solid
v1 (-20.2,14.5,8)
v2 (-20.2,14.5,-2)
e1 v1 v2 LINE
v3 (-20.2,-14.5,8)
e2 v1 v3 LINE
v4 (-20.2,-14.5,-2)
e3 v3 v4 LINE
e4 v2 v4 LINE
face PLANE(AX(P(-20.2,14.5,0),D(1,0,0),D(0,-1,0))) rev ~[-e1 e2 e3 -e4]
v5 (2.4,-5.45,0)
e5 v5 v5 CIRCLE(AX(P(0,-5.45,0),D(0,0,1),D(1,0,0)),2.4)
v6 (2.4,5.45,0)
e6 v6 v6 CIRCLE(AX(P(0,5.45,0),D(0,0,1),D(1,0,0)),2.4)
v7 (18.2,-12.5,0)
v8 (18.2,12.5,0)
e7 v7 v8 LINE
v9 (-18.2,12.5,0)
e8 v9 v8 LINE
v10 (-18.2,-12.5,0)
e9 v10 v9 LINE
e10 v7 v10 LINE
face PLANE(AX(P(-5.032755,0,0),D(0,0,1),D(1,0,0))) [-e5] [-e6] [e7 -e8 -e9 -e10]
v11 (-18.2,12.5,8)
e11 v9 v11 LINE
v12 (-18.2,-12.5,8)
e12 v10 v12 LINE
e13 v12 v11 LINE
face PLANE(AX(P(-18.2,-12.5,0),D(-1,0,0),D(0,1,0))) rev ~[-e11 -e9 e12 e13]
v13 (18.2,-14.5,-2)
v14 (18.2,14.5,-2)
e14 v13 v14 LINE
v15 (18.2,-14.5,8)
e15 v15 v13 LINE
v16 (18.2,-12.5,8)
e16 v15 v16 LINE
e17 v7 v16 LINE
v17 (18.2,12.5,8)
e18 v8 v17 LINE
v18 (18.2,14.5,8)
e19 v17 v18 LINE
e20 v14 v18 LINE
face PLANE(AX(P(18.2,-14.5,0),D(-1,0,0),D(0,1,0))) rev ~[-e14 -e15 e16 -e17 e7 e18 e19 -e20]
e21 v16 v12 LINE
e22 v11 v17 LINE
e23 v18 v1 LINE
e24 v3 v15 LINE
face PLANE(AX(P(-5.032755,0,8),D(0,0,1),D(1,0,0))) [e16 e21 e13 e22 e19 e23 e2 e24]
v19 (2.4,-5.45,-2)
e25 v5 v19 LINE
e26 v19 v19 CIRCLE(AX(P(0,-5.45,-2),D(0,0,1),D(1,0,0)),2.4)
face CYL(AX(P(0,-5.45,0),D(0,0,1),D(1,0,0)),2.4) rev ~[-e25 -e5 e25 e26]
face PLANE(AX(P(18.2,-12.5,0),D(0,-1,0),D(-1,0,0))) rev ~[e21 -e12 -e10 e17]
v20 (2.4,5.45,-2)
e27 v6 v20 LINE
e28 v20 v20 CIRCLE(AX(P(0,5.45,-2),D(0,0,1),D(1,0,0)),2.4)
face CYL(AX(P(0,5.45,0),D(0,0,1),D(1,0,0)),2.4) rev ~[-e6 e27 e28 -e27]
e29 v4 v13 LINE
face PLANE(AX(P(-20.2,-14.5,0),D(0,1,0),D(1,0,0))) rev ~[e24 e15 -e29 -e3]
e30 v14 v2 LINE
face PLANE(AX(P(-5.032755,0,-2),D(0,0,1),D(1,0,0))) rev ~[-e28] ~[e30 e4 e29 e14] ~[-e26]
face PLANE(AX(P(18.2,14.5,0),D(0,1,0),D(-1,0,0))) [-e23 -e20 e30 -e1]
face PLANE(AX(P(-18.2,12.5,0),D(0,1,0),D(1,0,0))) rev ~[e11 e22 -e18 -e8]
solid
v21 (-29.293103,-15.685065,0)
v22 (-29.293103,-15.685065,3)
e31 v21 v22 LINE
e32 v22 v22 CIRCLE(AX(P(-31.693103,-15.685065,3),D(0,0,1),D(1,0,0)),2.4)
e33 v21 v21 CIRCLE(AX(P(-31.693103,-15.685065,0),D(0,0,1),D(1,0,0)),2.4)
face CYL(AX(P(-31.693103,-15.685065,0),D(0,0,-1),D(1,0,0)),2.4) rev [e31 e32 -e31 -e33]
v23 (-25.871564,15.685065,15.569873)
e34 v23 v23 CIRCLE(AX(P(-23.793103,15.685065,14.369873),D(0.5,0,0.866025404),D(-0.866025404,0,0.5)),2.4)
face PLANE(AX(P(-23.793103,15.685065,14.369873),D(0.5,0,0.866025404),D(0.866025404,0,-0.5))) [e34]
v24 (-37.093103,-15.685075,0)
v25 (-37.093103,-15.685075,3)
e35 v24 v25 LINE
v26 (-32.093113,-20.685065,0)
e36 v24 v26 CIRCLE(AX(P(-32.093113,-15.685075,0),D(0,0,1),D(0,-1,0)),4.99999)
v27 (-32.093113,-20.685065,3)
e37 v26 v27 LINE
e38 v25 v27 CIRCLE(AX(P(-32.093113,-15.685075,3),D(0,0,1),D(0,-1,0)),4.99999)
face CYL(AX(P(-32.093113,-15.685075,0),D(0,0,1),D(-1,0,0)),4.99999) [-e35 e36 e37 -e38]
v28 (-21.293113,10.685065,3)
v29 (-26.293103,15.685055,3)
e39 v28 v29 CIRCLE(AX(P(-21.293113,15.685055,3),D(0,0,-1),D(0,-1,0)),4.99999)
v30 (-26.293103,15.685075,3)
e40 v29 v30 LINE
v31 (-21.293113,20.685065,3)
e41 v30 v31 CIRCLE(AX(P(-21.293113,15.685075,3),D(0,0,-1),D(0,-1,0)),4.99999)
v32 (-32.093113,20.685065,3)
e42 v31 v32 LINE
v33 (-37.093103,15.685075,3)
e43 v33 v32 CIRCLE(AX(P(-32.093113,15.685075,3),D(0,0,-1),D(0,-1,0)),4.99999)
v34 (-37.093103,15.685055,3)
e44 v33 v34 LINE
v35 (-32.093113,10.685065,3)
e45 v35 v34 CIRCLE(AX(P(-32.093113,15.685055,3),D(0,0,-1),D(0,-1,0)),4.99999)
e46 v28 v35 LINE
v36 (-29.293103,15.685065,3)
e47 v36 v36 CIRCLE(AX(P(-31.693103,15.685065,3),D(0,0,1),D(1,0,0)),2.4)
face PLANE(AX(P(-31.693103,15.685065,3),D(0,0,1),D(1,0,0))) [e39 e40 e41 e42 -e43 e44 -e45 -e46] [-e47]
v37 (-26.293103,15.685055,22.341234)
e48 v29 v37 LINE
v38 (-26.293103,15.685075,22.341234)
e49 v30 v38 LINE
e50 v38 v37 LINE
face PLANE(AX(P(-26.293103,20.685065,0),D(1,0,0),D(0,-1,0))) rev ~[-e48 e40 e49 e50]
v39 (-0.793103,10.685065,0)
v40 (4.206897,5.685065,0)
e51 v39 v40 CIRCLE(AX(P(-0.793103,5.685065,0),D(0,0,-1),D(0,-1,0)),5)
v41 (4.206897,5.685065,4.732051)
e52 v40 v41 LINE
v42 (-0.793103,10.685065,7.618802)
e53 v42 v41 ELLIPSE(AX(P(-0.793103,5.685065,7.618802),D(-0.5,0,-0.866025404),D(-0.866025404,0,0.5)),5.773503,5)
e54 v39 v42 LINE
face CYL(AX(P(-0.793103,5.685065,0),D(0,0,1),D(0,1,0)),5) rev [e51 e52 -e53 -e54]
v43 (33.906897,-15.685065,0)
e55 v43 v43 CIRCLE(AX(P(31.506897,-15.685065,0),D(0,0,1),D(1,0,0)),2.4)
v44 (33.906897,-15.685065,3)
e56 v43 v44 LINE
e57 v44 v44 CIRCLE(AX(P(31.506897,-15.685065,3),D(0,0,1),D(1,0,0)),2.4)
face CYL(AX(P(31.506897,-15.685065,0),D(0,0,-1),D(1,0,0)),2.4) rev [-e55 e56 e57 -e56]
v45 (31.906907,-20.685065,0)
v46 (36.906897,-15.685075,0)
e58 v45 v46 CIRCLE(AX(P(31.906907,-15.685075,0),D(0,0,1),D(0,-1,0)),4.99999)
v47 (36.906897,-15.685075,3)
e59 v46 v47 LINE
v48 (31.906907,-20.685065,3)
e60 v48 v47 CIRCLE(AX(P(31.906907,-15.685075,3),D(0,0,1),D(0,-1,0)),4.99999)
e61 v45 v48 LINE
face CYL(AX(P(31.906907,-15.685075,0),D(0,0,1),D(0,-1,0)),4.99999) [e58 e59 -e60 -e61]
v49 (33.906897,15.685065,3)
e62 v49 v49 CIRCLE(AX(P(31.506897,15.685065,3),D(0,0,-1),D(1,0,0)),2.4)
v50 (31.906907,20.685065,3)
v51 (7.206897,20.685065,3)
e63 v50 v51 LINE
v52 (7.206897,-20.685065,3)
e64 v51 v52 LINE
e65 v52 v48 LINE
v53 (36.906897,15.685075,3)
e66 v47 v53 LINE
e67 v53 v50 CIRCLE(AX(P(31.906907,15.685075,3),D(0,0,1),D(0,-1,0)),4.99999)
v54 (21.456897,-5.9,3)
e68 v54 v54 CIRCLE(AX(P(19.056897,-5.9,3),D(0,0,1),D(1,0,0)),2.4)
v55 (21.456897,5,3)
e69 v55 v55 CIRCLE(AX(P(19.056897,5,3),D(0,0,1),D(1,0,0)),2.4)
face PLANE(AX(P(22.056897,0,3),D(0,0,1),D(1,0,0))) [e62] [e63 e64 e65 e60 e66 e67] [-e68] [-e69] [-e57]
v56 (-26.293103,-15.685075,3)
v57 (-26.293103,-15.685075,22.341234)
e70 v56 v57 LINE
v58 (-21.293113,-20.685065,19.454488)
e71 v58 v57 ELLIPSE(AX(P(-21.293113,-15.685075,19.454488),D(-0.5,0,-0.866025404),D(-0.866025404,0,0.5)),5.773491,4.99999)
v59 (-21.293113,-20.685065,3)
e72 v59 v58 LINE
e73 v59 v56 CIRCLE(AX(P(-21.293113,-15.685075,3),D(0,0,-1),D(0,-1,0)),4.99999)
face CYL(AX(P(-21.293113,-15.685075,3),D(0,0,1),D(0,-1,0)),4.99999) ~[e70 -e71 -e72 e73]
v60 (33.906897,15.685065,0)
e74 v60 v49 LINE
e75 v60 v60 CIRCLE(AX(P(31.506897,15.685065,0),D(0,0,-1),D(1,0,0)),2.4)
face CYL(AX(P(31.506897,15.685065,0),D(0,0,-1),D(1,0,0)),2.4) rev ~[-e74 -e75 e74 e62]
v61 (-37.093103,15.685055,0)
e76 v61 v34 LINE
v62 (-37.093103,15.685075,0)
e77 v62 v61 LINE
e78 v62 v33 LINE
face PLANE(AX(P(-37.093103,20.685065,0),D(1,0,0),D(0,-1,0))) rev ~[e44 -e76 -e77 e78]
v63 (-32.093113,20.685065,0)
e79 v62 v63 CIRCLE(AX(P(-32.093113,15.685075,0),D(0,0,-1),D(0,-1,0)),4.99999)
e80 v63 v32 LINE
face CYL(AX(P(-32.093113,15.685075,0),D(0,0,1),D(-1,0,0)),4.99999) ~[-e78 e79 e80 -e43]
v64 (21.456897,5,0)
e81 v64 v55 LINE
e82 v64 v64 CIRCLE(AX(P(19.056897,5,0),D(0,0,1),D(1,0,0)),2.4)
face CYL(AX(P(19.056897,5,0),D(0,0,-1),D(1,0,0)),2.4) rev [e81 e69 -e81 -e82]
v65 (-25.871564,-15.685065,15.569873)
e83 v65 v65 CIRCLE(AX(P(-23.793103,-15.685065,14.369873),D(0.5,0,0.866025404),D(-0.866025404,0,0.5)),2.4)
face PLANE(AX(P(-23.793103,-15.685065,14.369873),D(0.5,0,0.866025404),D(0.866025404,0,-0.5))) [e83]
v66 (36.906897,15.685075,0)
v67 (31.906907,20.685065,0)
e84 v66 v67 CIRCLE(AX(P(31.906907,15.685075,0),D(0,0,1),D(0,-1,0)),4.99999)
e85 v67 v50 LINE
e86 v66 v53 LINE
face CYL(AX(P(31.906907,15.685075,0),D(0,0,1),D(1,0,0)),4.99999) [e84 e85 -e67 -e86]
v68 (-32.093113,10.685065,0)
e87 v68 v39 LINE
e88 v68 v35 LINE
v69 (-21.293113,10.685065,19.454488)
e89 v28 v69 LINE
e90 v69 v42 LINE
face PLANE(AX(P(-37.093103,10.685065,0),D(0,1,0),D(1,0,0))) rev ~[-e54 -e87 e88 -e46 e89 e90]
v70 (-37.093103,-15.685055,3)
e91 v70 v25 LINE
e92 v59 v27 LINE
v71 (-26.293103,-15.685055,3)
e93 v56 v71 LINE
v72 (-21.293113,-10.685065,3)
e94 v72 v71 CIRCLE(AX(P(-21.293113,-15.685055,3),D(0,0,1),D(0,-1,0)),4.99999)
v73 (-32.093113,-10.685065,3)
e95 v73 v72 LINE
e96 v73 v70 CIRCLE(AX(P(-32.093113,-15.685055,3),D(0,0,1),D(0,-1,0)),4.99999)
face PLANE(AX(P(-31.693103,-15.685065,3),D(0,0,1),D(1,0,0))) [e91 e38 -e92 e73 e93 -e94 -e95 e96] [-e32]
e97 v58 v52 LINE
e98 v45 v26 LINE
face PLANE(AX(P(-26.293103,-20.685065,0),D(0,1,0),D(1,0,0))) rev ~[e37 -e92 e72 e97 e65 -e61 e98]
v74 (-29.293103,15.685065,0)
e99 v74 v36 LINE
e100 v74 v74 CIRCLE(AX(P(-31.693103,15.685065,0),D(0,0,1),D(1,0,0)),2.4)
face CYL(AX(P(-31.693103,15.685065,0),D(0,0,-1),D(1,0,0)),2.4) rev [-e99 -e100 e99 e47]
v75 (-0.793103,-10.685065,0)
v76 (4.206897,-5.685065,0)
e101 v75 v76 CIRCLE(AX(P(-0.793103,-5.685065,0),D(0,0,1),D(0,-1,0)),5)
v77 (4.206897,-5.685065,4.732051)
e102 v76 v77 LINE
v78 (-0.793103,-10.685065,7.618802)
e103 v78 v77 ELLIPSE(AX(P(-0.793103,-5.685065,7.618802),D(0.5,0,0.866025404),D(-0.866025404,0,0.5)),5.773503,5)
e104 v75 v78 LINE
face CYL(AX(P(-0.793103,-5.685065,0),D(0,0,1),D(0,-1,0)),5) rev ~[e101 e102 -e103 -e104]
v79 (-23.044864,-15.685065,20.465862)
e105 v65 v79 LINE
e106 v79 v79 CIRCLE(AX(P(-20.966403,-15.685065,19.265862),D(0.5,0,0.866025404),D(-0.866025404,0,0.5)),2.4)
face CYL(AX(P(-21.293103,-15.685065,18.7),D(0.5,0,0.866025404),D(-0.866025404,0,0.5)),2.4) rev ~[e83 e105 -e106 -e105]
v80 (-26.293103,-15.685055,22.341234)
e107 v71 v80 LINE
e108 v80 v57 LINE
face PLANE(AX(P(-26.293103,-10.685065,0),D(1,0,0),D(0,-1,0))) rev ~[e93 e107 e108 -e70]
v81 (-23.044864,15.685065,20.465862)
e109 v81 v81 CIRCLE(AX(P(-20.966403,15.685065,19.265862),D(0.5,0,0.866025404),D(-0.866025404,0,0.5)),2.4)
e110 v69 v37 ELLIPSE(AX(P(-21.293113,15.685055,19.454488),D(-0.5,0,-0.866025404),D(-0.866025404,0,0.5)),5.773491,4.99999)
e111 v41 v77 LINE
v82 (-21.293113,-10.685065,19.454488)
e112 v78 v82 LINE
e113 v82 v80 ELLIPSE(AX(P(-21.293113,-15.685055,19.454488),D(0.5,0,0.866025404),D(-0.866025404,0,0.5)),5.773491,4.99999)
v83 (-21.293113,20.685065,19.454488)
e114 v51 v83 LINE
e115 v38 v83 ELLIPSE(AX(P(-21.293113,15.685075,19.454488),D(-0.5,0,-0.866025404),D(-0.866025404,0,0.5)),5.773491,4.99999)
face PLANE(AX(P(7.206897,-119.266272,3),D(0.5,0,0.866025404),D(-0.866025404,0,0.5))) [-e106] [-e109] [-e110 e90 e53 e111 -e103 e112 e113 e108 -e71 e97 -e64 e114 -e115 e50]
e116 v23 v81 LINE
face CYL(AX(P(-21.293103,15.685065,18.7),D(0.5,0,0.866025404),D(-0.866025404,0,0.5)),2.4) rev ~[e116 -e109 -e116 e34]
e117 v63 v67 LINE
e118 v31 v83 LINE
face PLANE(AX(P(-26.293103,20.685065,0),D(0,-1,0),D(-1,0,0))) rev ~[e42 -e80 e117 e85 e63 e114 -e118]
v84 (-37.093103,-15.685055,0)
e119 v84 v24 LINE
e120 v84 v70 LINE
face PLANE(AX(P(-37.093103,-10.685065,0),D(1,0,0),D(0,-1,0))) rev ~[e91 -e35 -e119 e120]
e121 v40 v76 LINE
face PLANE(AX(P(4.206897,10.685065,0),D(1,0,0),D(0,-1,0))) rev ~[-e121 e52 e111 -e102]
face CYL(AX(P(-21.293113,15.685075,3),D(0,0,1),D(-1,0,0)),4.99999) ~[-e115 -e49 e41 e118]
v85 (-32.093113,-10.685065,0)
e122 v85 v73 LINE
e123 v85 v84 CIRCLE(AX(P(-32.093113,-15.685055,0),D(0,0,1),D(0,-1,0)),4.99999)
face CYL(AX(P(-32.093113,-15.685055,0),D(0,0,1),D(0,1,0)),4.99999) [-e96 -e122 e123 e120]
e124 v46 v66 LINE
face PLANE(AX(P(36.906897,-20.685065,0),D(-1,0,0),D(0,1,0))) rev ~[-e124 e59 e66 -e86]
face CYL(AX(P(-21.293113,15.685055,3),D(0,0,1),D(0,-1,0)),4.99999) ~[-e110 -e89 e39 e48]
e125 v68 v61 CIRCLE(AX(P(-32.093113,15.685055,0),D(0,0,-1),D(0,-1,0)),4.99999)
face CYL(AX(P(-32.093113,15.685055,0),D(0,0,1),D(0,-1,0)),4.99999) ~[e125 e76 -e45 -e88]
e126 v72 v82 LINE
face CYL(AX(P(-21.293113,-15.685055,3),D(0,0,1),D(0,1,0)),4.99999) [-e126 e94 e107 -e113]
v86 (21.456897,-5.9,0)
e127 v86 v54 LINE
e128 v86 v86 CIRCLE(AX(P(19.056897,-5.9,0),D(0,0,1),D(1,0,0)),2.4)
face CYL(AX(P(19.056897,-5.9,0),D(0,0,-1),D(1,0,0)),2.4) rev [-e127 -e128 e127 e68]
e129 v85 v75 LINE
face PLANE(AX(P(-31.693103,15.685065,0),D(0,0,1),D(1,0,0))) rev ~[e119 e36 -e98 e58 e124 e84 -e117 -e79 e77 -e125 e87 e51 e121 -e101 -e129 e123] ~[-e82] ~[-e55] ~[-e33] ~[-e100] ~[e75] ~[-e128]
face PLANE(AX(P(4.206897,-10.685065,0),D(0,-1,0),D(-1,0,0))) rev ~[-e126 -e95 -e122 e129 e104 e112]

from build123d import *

# Parameters (mm, degrees)
F0_W        = 3
F0_H        = 5
F1_DEPTH    = 25
F0_R        = 2.4
F2_DEPTH    = 3
F3_T4_DEPTH = 238.5325445422
F4_R        = 4.99999
F5_R        = 4.99999
F6_R        = 5
F8_DEPTH    = 5
F9_ANGLE    = -30
F10_ANGLE   = -30
F7_W        = 36.4
F7_H        = 25
F7_R        = 4.4
F7_R_2      = 2.4
F13_DEPTH   = 2
F14_DEPTH   = 8


# Not quite as in the source:
# - a fillet or chamfer that OpenCascade refuses, or shapes differently, is made with other operations: its cross-section is extruded or revolved along the edge and cut away or added
# - a fillet or chamfer is up to 0.001 mm smaller than in the source, because OpenCascade refuses the exact size


with BuildPart() as f1:
    # F0 (on Top) → F1 (new body)
    with BuildSketch(Plane.XY):
        Polygon((-26.2931033156, 20.6850649182), (-26.2931033156, 15.6850649182), (-26.2931033156, 10.6850649182), (4.2068966844, 10.6850649182), (4.2068966844, 15.6850649182), (4.2068966844, 20.6850649182), align=None)
        with BuildLine():
            ThreePointArc((-18.8931033156, 15.6850649182), (-21.2931033156, 13.2850649182), (-23.6931033156, 15.6850649182))
            ThreePointArc((-23.6931033156, 15.6850649182), (-21.2931033156, 18.0850649182), (-18.8931033156, 15.6850649182))
        make_face(mode=Mode.SUBTRACT)
        Polygon((4.2068966844, -20.6850649182), (4.2068966844, -10.6850649182), (-26.2931033156, -10.6850649182), (-26.2931033156, -15.6850649182), (-26.2931033156, -20.6850649182), align=None)
        with BuildLine():
            ThreePointArc((-18.8931033156, -15.6850649182), (-21.2931033156, -18.0850649182), (-23.6931033156, -15.6850649182))
            ThreePointArc((-23.6931033156, -15.6850649182), (-21.2931033156, -13.2850649182), (-18.8931033156, -15.6850649182))
        make_face(mode=Mode.SUBTRACT)
        Polygon((4.2068966844, 15.6850649182), (4.2068966844, 10.6850649182), (4.2068966844, -10.6850649182), (4.2068966844, -20.6850649182), (7.2068966844, -20.6850649182), (7.2068966844, 15.6850649182), align=None)
        with BuildLine():
            ThreePointArc((-18.8931033156, 15.6850649182), (-21.2931033156, 18.0850649182), (-23.6931033156, 15.6850649182))
            ThreePointArc((-23.6931033156, 15.6850649182), (-21.2931033156, 13.2850649182), (-18.8931033156, 15.6850649182))
        make_face()
        with BuildLine():
            ThreePointArc((-18.8931033156, -15.6850649182), (-21.2931033156, -13.2850649182), (-23.6931033156, -15.6850649182))
            ThreePointArc((-23.6931033156, -15.6850649182), (-21.2931033156, -18.0850649182), (-18.8931033156, -15.6850649182))
        make_face()
        with Locations((5.7068966844, 18.1850649182)):
            Rectangle(F0_W, F0_H)
    extrude(amount=F1_DEPTH)

    # F0 (on Top) → F2 (join)
    with BuildSketch(Plane.XY):
        Polygon((-26.2931033156, 10.6850649182), (-26.2931033156, 15.6850649182), (-26.2931033156, 20.6850649182), (-37.0931033156, 20.6850649182), (-37.0931033156, 10.6850649182), align=None)
        with Locations((-31.6931033156, 15.6850649182)):
            Circle(F0_R, mode=Mode.SUBTRACT)
        Polygon((-26.2931033156, -15.6850649182), (-26.2931033156, -10.6850649182), (-37.0931033156, -10.6850649182), (-37.0931033156, -20.6850649182), (-26.2931033156, -20.6850649182), align=None)
        with Locations((-31.6931033156, -15.6850649182)):
            Circle(F0_R, mode=Mode.SUBTRACT)
        Polygon((36.9068966844, 20.6850649182), (7.2068966844, 20.6850649182), (7.2068966844, 15.6850649182), (7.2068966844, -20.6850649182), (36.9068966844, -20.6850649182), align=None)
        with Locations((31.5068966844, -15.6850649182)):
            Circle(F0_R, mode=Mode.SUBTRACT)
        with Locations((19.0568966844, -5.9)):
            Circle(F0_R, mode=Mode.SUBTRACT)
        with Locations((19.0568966844, 5)):
            Circle(F0_R, mode=Mode.SUBTRACT)
        with BuildLine():
            ThreePointArc((29.1068966844, 15.6850649182), (31.5068966844, 18.0850649182), (33.9068966844, 15.6850649182))
            ThreePointArc((33.9068966844, 15.6850649182), (31.5068966844, 13.2850649182), (29.1068966844, 15.6850649182))
        make_face(mode=Mode.SUBTRACT)
    extrude(amount=F2_DEPTH)

    # F3: chamfer of 22 x 38.1051177665 on 1 edges, made by hand


with BuildPart() as f3_tool2:
    # F3_s3 → F3_t4 (new body)
    with BuildSketch(Plane.XZ.offset(119.2662722711)):
        Polygon((7.2068966844, 3), (-30.8982210821, 25), (7.2068966844, 25), align=None)
    extrude(amount=-F3_T4_DEPTH)

    split(bisect_by=Plane.XY.offset(3), keep=Keep.TOP)


with BuildPart() as f1_1:
    add(f1.part)

    # F3_t1: cut F3_tool2
    add(f3_tool2.part, mode=Mode.SUBTRACT)

    # F4 (radius 5 in the source; OpenCascade refuses exactly that, so slightly less here)
    f4_edges = [f1_1.edges().sort_by_distance(p)[0] for p in [
        (-37.093103, 20.685065, 1.5),
        (-37.093103, 10.685065, 1.5),
        (-37.093103, -10.685065, 1.5),
        (-37.093103, -20.685065, 1.5),
        (36.906897, -20.685065, 1.5),
        (36.906897, 20.685065, 1.5),
    ]]
    fillet(f4_edges, radius=F4_R)

    # F5 (radius 5 in the source; OpenCascade refuses exactly that, so slightly less here)
    f5_edges = [f1_1.edges().sort_by_distance(p)[0] for p in [
        (-26.293103, 20.685065, 12.670617),
        (-26.293103, 10.685065, 12.670617),
        (-26.293103, -10.685065, 12.670617),
        (-26.293103, -20.685065, 12.670617),
    ]]
    fillet(f5_edges, radius=F5_R)

    # F6
    f6_edges = [f1_1.edges().sort_by_distance(p)[0] for p in [
        (4.206897, 10.685065, 2.366025),
        (4.206897, -10.685065, 2.366025),
    ]]
    fillet(f6_edges, radius=F6_R)


with BuildPart() as f8:
    # F0 (on Top) → F8 (new body, symmetric)
    with BuildSketch(Plane.XY):
        with BuildLine():
            ThreePointArc((-18.8931033156, 15.6850649182), (-21.2931033156, 18.0850649182), (-23.6931033156, 15.6850649182))
            ThreePointArc((-23.6931033156, 15.6850649182), (-21.2931033156, 13.2850649182), (-18.8931033156, 15.6850649182))
        make_face()
    extrude(amount=F8_DEPTH, both=True)


with BuildPart() as f8b:
    # F0 (on Top) → F8, piece 2 (new body, symmetric)
    with BuildSketch(Plane.XY):
        with BuildLine():
            ThreePointArc((-18.8931033156, -15.6850649182), (-21.2931033156, -13.2850649182), (-23.6931033156, -15.6850649182))
            ThreePointArc((-23.6931033156, -15.6850649182), (-21.2931033156, -18.0850649182), (-18.8931033156, -15.6850649182))
        make_face()
    extrude(amount=F8_DEPTH, both=True)


with BuildPart() as f8b_1:
    # F9: moved
    add(f8b.part.rotate(Axis((-21.2931033156, -15.6850649182, 0), (0, -1, 0)), F9_ANGLE))


with BuildPart() as f8_1:
    # F10: moved
    add(f8.part.rotate(Axis((-21.2931033156, 15.6850649182, 0), (0, -1, 0)), F10_ANGLE))


with BuildPart() as f8b_2:
    # F11: moved
    add(f8b_1.part.moved(Location((0, 0, 18.7))))


with BuildPart() as f8_2:
    # F11: moved
    add(f8_1.part.moved(Location((0, 0, 18.7))))


with BuildPart() as f1_2:
    add(f1_1.part)

    # F12: cut F8, F8b
    add(f8_2.part, mode=Mode.SUBTRACT)
    add(f8b_2.part, mode=Mode.SUBTRACT)


with BuildPart() as f13:
    # F7 (on Top) → F13 (new body)
    with BuildSketch(Plane.XY):
        Polygon((18.2, -14.5), (18.2, -12.5), (-18.2, -12.5), (-18.2, 12.5), (18.2, 12.5), (18.2, 14.5), (-20.2, 14.5), (-20.2, -14.5), align=None)
        Rectangle(F7_W, F7_H)
        with Locations((0, -5.45)):
            Circle(F7_R, mode=Mode.SUBTRACT)
        with Locations((0, 5.45)):
            Circle(F7_R, mode=Mode.SUBTRACT)
        with Locations((0, 5.45)):
            Circle(F7_R)
        with Locations((0, 5.45)):
            Circle(F7_R_2, mode=Mode.SUBTRACT)
        with Locations((0, -5.45)):
            Circle(F7_R)
        with Locations((0, -5.45)):
            Circle(F7_R_2, mode=Mode.SUBTRACT)
    extrude(amount=-F13_DEPTH)

    # F7 (on Top) → F14 (join)
    with BuildSketch(Plane.XY):
        Polygon((18.2, -14.5), (18.2, -12.5), (-18.2, -12.5), (-18.2, 12.5), (18.2, 12.5), (18.2, 14.5), (-20.2, 14.5), (-20.2, -14.5), align=None)
    extrude(amount=F14_DEPTH)


solid = Compound([f1_2.part, f13.part])
